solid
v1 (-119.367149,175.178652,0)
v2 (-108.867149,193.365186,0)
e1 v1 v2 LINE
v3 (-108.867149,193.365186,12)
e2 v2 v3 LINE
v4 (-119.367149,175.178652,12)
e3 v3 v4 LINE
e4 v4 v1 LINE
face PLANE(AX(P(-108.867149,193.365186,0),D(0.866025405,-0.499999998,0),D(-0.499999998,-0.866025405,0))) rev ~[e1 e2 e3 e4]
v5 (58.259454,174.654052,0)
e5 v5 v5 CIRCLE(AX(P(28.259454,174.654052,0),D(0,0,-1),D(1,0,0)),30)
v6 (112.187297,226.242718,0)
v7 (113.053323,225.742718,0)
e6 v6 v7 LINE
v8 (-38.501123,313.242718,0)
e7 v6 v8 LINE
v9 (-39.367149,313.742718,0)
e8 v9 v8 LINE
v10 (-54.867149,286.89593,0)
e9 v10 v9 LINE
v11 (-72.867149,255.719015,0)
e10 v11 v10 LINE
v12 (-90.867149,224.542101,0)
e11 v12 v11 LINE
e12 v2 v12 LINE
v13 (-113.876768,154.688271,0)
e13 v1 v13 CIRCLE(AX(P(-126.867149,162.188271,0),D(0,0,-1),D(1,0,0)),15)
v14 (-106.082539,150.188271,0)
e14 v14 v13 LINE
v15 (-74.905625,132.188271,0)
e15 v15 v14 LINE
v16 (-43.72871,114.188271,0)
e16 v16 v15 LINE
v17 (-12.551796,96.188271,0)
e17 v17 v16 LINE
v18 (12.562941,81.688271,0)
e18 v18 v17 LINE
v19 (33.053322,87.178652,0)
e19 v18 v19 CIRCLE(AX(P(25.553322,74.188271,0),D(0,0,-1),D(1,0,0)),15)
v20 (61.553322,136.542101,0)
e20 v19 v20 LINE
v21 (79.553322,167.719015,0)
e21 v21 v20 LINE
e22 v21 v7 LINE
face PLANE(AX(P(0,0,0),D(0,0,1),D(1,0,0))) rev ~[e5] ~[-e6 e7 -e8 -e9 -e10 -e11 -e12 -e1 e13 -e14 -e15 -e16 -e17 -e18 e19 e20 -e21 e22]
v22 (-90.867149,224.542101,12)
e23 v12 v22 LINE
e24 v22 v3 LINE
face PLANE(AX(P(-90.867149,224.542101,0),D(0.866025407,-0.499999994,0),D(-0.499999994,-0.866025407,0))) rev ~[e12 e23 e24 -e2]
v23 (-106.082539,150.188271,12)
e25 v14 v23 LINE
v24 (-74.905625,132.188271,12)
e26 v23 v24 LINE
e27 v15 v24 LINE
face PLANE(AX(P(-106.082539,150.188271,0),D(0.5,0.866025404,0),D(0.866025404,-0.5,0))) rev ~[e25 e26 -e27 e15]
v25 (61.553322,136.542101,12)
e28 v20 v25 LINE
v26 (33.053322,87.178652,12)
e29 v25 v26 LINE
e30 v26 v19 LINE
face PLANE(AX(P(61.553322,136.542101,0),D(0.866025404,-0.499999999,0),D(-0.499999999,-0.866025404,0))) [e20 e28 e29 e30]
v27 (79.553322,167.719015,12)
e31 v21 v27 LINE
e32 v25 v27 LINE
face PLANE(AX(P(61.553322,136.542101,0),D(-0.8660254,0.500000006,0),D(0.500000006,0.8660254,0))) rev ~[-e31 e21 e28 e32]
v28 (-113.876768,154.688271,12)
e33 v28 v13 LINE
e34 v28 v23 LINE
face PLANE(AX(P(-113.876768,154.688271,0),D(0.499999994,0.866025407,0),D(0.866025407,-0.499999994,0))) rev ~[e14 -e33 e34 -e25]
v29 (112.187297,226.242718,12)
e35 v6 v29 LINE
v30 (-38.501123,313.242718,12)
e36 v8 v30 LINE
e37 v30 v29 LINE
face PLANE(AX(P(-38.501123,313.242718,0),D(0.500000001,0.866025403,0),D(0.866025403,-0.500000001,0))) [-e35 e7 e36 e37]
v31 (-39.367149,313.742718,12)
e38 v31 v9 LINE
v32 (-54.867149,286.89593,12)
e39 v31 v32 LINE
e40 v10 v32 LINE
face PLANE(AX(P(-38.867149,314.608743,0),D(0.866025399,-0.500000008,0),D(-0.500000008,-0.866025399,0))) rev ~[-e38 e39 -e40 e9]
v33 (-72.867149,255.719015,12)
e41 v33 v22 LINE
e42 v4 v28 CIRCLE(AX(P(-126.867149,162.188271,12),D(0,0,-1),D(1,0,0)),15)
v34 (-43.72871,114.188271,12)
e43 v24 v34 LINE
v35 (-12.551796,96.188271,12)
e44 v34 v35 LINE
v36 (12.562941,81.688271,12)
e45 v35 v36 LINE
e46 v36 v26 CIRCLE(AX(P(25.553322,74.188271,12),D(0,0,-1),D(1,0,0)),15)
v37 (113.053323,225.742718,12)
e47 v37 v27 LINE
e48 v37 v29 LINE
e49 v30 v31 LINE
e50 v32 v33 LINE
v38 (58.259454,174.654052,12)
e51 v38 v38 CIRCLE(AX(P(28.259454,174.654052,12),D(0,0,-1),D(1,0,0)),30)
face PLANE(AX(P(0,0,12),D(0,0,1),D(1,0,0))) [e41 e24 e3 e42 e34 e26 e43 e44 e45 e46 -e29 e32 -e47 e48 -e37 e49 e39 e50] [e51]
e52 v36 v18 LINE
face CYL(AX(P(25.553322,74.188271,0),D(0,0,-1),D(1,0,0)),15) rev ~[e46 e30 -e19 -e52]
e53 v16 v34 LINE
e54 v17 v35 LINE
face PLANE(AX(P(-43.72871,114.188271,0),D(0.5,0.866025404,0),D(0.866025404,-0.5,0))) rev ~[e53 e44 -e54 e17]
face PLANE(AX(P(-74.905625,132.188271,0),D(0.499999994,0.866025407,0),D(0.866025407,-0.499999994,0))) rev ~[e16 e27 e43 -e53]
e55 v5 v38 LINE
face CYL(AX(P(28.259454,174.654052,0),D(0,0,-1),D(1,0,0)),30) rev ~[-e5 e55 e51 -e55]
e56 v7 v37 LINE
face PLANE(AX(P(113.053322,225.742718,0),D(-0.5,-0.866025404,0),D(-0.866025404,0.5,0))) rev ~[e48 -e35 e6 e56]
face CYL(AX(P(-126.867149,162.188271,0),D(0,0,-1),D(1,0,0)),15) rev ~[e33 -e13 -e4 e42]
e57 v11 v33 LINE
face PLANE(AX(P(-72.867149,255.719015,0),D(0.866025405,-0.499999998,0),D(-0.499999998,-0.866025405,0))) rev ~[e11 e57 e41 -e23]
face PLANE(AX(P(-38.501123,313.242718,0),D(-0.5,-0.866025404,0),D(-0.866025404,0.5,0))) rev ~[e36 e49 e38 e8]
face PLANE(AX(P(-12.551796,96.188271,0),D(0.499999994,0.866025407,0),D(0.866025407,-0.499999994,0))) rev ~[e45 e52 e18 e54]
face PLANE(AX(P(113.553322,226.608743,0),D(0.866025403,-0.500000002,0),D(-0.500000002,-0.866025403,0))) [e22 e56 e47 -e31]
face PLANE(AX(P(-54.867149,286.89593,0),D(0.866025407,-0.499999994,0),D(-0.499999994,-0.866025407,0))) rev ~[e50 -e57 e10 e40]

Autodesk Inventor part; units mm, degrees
ref_plane "YZ Plane" through (0, 0, 0) normal (1, 0, 0) x (0, 1, 0)
ref_plane "XZ Plane" through (0, 0, 0) normal (0, 1, 0) x (-1, 0, 0)
ref_plane "XY Plane" through (0, 0, 0) normal (0, 0, 1) x (1, 0, 0)
ref_plane "Work Plane1" through (0, 0, 0) normal (0, 0, 1) x (1, 0, 0)
sketch "Sketch1" plane through (0, 0, 0) normal (0, 0, 1) x (1, 0, 0)
  circle A0 centre (68.259454, 214.654052) radius 4
  line L0 (64.259454, -185.345948) -> (64.259454, -225.345948)
  arc A1 (72.259454, -185.345948) -> (64.259454, -185.345948) centre (68.259454, -185.345948) ccw
  line L1 (72.259454, -225.345948) -> (72.259454, -185.345948)
  arc A2 (64.259454, -225.345948) -> (72.259454, -225.345948) centre (68.259454, -225.345948) ccw
  line L2 (-101.259454, 230.542101) -> (-90.867149, 224.542101)
  line L3 (-90.867149, 224.542101) -> (-108.867149, 193.365186)
  line L4 (-108.867149, 193.365186) -> (-119.259454, 199.365186)
  line L5 (-137.259454, 168.188271) -> (-119.259454, 199.365186)
  line L6 (-137.259454, 168.188271) -> (-106.082539, 150.188271)
  line L7 (-106.082539, 150.188271) -> (-112.082539, 139.795967)
  line L8 (-80.905625, 121.795967) -> (-112.082539, 139.795967)
  line L9 (-80.905625, 121.795967) -> (-74.905625, 132.188271)
  line L10 (-74.905625, 132.188271) -> (-43.72871, 114.188271)
  line L11 (-43.72871, 114.188271) -> (-49.72871, 103.795967)
  line L12 (-18.551796, 85.795967) -> (-49.72871, 103.795967)
  line L13 (-18.551796, 85.795967) -> (-12.551796, 96.188271)
  line L14 (-12.551796, 96.188271) -> (18.625119, 78.188271)
  line L15 (18.625119, 78.188271) -> (12.625119, 67.795967)
  line L16 (23.259454, 61.656231) -> (12.625119, 67.795967)
  line L17 (23.259454, -7.001047) -> (23.259454, 61.656231)
  line L18 (23.259454, -7.001047) -> (35.259454, -7.001047)
  line L19 (35.259454, -7.001047) -> (35.259454, -43.001047)
  line L20 (35.259454, -43.001047) -> (23.259454, -43.001047)
  line L21 (23.259454, -79.001047) -> (23.259454, -43.001047)
  line L22 (23.259454, -79.001047) -> (35.259454, -79.001047)
  line L23 (35.259454, -79.001047) -> (35.259454, -115.001047)
  line L24 (35.259454, -115.001047) -> (23.259454, -115.001047)
  line L25 (23.259454, -151.001047) -> (23.259454, -115.001047)
  line L26 (23.259454, -151.001047) -> (35.259454, -151.001047)
  line L27 (35.259454, -151.001047) -> (35.259454, -187.001047)
  line L28 (35.259454, -187.001047) -> (23.259454, -187.001047)
  line L29 (23.259454, -223.001047) -> (23.259454, -187.001047)
  line L30 (23.259454, -223.001047) -> (35.259454, -223.001047)
  line L31 (35.259454, -223.001047) -> (35.259454, -259.001047)
  line L32 (35.259454, -259.001047) -> (23.259454, -259.001047)
  line L33 (23.259454, -295.001047) -> (23.259454, -259.001047)
  line L34 (23.259454, -295.001047) -> (35.259454, -295.001047)
  line L35 (35.259454, -295.001047) -> (35.259454, -331.001047)
  line L36 (105.759454, -290.297853) -> (35.259454, -331.001047)
  arc A3 (105.759454, -290.297853) -> (143.259454, -225.345948) centre (68.259454, -225.345948) ccw
  line L37 (143.259454, -185.345948) -> (143.259454, -225.345948)
  arc A4 (143.259454, -185.345948) -> (125.301159, -136.650529) centre (68.259454, -185.345948) ccw
  arc A5 (114.658634, -107.792431) -> (125.301159, -136.650529) centre (159.105469, -107.792431) ccw
  line L38 (114.658634, 129.266291) -> (114.658634, -107.792431)
  arc A6 (128.128133, 169.479488) -> (114.658634, 129.266291) centre (181.421641, 129.266291) ccw
  arc A7 (128.128133, 169.479488) -> (62.965391, 289.466971) centre (68.259454, 214.654052) ccw
  arc A8 (5.90664, 302.61499) -> (62.965391, 289.466971) centre (55.90664, 389.21753) ccw
  line L39 (-43.259454, 331.001047) -> (5.90664, 302.61499)
  line L40 (-65.259454, 292.89593) -> (-43.259454, 331.001047)
  line L41 (-65.259454, 292.89593) -> (-54.867149, 286.89593)
  line L42 (-54.867149, 286.89593) -> (-72.867149, 255.719015)
  line L43 (-72.867149, 255.719015) -> (-83.259454, 261.719015)
  line L44 (-101.259454, 230.542101) -> (-83.259454, 261.719015)
  circle A9 centre (28.259454, 174.654052) radius 30
  line L45 (71.945627, 130.542101) -> (61.553322, 136.542101)
  line L46 (61.553322, 136.542101) -> (79.553322, 167.719015)
  line L47 (79.553322, 167.719015) -> (89.945627, 161.719015)
  line L48 (89.945627, 161.719015) -> (71.945627, 130.542101)
  line L49 (-32.867149, 325.001047) -> (-54.867149, 286.89593)
  line L50 (61.553322, 136.542101) -> (30.062941, 81.999161)
  line L51 (-12.551796, 96.188271) -> (18.625119, 78.188271)
  line L52 (-38.001123, 314.108743) -> (112.687297, 227.108743)
  line L53 (-54.867149, 286.89593) -> (-72.867149, 255.719015)
  line L54 (-74.905625, 132.188271) -> (-43.72871, 114.188271)
  line L55 (-38.001123, 314.108743) -> (112.687297, 227.108743)
  line L56 (119.553322, 237.001047) -> (79.553322, 167.719015)
  line L57 (-38.867149, 314.608743) -> (-126.867149, 162.188271)
  line L58 (-126.867149, 162.188271) -> (25.553322, 74.188271)
  line L59 (25.553322, 74.188271) -> (113.553322, 226.608743)
  line L60 (113.553322, 226.608743) -> (-38.867149, 314.608743)
  circle A10 centre (-126.867149, 162.188271) radius 15
  circle A11 centre (25.553322, 74.188271) radius 15
  circle A12 centre (28.259454, 174.654052) radius 30
  point P0 (0, 0)
  point P1 (37.343087, 270.608743)
  point P2 (37.343087, 270.608743)
  point P3 (70.553322, 152.130558)
  point P4 (-59.317167, 123.188271)
  point P5 (12.562941, 81.688271)
  point P6 (33.053322, 87.178653)
  point P7 (-119.367149, 175.178653)
  point P8 (-113.876768, 154.688271)
  dimension "d0" = 30
  dimension "d1" = 30
  dimension "d2" = 60
extrude "Extrusion1" add sketch "Sketch1" along normal blind 12 contours A0 | L57 L42 L49 L60 L52 L56 L46 L50 A11 L14 L58 L10 L6 A10 L3
move faces "Move1" translate (-0.5, -0.866025, 0) faces at (62.457823, 256.108743, 4)
sketch "Sketch2" plane through (0, 0, 12) normal (0, 0, 1) x (1, 0, 0)
  line L0 (-39.367149, 313.742717) -> (-119.367149, 175.178653)
  arc A0 (-113.876768, 154.688271) -> (-119.367149, 175.178653) centre (-126.867149, 162.188271) ccw
  line L1 (-113.876768, 154.688271) -> (12.562941, 81.688271)
  arc A1 (33.053322, 87.178653) -> (12.562941, 81.688271) centre (25.553322, 74.188271) ccw
  line L2 (33.053322, 87.178653) -> (113.053322, 225.742717)
  line L3 (113.053322, 225.742717) -> (-39.367149, 313.742717)
  circle A2 centre (28.259454, 174.654052) radius 30
  point P0 (0, 0)
equation "\"d1\" = d0"
properties part number "wooden_internal"
